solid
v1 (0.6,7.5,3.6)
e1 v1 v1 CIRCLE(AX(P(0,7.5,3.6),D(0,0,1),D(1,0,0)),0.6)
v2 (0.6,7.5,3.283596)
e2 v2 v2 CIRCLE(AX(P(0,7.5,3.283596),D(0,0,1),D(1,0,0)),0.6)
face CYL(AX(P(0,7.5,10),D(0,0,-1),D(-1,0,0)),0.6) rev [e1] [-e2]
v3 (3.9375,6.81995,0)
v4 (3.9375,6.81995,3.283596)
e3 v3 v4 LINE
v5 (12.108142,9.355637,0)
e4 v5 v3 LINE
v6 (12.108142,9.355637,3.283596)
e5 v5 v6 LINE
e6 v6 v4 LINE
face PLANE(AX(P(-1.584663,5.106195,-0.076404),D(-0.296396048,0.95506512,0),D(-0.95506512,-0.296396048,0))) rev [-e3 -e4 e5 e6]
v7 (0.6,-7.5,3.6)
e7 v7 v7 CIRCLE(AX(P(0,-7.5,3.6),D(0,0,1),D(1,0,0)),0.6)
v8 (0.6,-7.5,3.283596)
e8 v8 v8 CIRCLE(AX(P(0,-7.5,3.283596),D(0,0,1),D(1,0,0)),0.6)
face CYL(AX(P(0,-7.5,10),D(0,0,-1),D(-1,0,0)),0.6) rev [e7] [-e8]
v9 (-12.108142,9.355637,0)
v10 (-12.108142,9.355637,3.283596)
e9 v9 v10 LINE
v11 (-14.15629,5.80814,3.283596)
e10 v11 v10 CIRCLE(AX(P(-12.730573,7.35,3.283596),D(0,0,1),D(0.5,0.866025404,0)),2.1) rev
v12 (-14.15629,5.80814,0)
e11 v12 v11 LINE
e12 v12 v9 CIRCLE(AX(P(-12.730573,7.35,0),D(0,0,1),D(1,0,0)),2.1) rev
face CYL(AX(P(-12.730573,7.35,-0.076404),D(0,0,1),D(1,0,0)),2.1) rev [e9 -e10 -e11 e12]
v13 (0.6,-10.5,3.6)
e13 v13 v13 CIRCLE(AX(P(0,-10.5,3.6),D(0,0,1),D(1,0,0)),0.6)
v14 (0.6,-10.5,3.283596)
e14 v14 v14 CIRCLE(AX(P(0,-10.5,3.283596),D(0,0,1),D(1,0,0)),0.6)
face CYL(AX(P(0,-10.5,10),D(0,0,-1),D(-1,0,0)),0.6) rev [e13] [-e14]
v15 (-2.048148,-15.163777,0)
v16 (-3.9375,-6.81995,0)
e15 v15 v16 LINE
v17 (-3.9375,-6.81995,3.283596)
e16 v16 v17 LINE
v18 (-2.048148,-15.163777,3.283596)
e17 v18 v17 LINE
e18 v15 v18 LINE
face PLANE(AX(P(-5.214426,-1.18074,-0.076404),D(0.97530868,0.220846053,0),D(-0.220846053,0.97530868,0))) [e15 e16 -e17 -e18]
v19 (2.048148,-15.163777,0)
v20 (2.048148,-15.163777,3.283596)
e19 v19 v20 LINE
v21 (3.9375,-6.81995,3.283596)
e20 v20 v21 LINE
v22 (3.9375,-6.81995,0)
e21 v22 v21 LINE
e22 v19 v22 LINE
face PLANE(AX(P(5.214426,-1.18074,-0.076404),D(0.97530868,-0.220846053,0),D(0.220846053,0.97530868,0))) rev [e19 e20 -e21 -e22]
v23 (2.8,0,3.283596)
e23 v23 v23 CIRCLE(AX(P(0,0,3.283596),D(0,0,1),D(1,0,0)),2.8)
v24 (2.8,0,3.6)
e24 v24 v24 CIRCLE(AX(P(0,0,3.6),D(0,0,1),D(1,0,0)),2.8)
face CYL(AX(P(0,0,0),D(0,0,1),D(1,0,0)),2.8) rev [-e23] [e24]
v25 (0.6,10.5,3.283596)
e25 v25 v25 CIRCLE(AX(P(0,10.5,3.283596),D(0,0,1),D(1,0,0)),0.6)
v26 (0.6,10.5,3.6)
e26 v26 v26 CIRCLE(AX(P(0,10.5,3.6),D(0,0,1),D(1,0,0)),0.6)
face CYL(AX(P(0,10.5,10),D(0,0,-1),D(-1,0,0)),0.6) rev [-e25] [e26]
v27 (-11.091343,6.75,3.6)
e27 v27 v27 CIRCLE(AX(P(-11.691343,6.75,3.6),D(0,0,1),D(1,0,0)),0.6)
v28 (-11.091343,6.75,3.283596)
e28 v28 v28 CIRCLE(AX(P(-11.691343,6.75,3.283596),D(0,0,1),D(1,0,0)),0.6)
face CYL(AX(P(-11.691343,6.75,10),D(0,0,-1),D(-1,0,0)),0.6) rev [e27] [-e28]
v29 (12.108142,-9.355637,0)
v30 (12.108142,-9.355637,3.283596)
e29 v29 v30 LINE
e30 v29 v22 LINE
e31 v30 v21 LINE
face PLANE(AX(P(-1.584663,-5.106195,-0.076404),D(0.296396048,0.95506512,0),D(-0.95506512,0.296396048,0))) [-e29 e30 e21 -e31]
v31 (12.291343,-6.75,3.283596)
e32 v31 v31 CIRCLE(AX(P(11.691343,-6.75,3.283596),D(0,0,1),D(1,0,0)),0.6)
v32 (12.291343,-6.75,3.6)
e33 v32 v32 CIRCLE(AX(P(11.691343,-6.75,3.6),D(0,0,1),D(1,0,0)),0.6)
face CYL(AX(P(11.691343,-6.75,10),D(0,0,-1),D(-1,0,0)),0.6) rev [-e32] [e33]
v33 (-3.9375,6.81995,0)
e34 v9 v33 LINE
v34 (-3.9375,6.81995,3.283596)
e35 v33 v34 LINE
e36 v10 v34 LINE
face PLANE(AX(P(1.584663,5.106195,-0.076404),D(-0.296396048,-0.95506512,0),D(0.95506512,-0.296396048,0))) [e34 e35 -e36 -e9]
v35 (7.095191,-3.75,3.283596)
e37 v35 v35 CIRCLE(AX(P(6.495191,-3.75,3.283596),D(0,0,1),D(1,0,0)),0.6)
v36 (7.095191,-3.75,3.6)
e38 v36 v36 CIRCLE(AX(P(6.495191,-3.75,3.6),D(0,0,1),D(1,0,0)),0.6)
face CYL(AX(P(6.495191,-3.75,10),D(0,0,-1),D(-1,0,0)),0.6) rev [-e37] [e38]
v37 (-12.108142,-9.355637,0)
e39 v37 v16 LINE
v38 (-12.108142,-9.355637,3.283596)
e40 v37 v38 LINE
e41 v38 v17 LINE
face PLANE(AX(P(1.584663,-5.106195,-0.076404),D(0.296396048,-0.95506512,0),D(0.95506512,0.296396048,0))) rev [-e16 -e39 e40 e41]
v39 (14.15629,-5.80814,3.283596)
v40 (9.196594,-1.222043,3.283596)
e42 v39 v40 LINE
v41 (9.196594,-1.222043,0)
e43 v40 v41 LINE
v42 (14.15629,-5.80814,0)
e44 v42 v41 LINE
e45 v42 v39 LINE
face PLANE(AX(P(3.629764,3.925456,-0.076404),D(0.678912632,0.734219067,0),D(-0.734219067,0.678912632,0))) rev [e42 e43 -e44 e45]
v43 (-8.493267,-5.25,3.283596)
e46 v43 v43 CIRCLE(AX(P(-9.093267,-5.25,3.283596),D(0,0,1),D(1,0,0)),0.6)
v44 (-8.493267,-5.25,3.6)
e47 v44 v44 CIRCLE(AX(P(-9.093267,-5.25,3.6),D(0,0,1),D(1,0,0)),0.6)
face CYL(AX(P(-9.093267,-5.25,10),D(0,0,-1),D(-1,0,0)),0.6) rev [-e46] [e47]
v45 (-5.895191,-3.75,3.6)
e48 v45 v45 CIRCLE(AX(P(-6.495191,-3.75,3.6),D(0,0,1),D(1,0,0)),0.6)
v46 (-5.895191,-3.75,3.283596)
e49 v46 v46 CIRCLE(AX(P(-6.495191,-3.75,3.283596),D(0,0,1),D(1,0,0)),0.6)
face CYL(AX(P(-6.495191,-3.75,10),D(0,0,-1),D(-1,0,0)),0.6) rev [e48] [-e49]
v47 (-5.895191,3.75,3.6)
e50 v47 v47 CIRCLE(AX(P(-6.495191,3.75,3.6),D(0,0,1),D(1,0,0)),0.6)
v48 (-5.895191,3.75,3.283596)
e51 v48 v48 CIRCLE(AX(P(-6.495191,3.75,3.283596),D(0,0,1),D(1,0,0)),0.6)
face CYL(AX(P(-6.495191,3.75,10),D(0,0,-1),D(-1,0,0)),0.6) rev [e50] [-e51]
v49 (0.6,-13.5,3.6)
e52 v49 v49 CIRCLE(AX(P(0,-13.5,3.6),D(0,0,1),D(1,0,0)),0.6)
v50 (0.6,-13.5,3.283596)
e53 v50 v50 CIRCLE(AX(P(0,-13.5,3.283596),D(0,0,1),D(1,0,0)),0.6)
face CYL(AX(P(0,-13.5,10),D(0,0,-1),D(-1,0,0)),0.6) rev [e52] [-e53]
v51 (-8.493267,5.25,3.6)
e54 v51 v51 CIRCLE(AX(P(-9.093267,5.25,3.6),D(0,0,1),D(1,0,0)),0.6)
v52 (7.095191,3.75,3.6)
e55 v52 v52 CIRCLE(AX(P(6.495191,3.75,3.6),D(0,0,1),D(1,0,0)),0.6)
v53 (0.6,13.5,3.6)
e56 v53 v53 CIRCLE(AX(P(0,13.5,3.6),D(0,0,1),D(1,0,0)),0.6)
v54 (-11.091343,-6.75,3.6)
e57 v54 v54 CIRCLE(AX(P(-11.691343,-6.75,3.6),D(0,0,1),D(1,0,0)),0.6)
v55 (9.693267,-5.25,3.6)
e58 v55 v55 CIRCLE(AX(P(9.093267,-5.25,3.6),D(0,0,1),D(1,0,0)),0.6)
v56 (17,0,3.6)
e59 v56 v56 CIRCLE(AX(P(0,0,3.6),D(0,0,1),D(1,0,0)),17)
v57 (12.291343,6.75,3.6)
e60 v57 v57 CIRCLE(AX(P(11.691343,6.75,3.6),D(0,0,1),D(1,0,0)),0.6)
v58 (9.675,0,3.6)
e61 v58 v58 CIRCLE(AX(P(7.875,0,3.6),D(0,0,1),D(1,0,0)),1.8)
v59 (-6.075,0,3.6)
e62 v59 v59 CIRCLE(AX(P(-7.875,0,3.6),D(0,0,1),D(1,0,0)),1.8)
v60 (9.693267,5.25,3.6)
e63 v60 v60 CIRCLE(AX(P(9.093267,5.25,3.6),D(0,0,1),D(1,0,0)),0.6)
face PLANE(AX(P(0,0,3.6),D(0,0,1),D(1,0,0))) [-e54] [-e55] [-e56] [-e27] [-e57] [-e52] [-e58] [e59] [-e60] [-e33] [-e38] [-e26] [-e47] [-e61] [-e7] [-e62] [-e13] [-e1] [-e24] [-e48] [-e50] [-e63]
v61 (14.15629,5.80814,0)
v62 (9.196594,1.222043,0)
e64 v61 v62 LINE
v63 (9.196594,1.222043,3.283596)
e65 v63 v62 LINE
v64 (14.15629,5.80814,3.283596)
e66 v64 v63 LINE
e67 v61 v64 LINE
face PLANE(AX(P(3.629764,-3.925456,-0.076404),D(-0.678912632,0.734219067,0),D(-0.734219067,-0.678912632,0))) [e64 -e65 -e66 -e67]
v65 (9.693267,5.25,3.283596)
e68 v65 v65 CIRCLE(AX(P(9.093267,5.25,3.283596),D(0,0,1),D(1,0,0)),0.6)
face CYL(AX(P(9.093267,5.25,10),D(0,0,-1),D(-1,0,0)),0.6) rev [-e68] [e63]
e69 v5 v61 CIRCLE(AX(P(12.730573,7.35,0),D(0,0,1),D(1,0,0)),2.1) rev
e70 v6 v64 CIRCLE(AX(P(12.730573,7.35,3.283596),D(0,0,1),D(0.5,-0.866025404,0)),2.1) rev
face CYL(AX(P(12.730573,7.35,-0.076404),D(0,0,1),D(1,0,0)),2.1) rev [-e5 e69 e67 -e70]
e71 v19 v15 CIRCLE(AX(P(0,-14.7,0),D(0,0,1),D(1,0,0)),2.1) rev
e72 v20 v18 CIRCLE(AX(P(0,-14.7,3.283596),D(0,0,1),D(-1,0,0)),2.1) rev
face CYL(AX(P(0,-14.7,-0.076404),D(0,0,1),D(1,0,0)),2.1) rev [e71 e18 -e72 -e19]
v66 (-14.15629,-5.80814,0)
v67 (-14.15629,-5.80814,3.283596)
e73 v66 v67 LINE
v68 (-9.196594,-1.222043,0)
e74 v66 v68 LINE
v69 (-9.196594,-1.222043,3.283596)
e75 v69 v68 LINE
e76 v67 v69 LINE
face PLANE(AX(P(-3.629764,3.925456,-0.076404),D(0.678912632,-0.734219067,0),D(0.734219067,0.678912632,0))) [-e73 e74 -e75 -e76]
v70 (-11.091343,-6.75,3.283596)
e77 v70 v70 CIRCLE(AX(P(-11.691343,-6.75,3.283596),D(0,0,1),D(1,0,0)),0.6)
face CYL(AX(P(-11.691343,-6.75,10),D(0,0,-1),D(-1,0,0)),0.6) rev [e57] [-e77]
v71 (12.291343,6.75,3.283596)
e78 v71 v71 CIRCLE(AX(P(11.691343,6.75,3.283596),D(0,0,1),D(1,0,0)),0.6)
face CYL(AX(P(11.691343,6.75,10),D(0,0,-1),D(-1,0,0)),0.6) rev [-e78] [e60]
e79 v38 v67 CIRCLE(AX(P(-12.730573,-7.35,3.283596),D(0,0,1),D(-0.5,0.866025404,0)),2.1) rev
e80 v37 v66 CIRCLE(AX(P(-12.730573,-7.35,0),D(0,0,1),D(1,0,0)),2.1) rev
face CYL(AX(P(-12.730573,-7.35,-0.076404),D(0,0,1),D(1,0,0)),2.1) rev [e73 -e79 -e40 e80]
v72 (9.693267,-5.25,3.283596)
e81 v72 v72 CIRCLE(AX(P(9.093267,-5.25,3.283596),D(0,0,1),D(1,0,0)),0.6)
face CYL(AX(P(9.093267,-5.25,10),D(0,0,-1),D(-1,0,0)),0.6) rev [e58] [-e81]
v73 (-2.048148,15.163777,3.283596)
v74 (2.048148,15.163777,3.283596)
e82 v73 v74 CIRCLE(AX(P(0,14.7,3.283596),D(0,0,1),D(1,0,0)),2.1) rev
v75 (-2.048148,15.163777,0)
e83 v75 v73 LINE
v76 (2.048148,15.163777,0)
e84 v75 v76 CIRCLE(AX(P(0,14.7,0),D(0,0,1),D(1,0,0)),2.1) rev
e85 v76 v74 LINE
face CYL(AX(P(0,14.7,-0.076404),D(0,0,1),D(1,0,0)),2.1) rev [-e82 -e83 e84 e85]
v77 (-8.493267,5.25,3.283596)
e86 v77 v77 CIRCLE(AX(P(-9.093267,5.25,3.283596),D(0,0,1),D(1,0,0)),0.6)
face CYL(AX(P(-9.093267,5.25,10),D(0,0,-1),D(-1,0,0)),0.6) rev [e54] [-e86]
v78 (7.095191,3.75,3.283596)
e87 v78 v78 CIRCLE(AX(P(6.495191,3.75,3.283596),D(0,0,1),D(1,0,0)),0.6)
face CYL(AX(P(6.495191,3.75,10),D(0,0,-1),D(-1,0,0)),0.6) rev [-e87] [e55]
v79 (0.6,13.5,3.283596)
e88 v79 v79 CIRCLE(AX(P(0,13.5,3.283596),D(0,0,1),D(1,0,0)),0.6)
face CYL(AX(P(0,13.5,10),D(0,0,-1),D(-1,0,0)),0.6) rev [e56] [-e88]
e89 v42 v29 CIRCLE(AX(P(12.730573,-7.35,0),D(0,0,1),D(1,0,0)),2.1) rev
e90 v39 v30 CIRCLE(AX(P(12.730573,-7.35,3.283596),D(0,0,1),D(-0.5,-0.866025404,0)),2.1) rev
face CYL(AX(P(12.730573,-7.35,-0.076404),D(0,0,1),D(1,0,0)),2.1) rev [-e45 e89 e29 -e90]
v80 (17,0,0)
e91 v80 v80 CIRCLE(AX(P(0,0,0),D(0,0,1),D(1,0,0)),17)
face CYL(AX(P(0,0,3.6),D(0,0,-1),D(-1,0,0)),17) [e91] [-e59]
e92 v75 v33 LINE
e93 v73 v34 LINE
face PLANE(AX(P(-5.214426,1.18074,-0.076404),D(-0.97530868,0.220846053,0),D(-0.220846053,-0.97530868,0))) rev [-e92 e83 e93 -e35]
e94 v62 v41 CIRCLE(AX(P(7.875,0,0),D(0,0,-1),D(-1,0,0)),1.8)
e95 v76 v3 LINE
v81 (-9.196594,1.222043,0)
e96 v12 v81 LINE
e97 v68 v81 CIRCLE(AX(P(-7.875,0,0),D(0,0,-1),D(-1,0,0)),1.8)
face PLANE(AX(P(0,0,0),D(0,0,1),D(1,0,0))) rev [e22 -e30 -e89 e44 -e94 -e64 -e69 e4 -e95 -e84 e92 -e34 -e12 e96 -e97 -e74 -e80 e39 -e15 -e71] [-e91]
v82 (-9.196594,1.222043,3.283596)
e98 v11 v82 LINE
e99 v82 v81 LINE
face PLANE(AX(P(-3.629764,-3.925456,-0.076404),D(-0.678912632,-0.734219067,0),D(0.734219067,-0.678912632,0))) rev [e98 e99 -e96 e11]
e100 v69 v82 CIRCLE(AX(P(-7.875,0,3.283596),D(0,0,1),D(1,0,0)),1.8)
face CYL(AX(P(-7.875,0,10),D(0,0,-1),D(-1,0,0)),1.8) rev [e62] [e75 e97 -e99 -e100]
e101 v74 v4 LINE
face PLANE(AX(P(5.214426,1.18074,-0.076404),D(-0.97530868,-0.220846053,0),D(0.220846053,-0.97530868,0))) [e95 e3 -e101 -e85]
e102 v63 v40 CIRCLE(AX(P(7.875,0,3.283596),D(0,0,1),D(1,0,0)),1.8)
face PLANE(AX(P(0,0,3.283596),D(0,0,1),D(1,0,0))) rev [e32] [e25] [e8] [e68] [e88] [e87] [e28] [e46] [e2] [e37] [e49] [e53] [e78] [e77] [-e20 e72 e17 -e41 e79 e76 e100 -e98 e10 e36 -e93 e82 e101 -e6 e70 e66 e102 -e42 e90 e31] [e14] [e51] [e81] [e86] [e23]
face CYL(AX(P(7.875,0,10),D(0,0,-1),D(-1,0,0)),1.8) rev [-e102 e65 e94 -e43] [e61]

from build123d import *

# Parameters (mm, degrees)
SKETCH1_R               = 17
BOSS_EXTRUDE1_DEPTH     = 3.6
CAVITY1_OUTLINE_R       = 3.15
CAVITY1_DEPTH           = 3.283595969
CAVITY1_START           = 1.183595969
CAVITY1_2_OUTLINE_R     = 3.15
CAVITY1_2_OUTLINE_R_2   = 1.575
CAVITY1_2_DEPTH         = 2.1
SKETCH2_R               = 0.6
CUT_EXTRUDE1_DEPTH      = 10
CIRPATTERN1_COUNT       = 6
SKETCH3_R               = 4.596048158
CUT_EXTRUDE2_DEPTH      = 3.283595969
CUT_EXTRUDE3_DEPTH      = 25.309668858
CUT_EXTRUDE3_DEPTH_BACK = 25.309668858
SKETCH4_R               = 2.8
SKETCH6_R               = 1.8
CUT_EXTRUDE4_DEPTH      = 10


# Read off the part's stored shape, not the designer's step: Cavity1
with BuildPart() as part:
    # Sketch1 → Boss-Extrude1 (new body)
    with BuildSketch(Plane.XY):
        Circle(SKETCH1_R)
    extrude(amount=BOSS_EXTRUDE1_DEPTH)

    # Cavity1 outline → Cavity1 (cut)
    with BuildSketch(Plane.XY):
        with BuildLine():
            Line((3.9375, 6.819950055), (2.048148228, 15.163776711))
            ThreePointArc((2.048148228, 15.163776711), (0, 16.8), (-2.048148228, 15.163776711))
            Line((-2.048148228, 15.163776711), (-3.9375, 6.819950055))
            Line((-3.9375, 6.819950055), (-12.108141735, 9.355636751))
            ThreePointArc((-12.108141735, 9.355636751), (-14.549226784, 8.4), (-14.156289963, 5.80813996))
            Line((-14.156289963, 5.80813996), (-7.875, 0))
            Line((-7.875, 0), (-14.156289963, -5.80813996))
            ThreePointArc((-14.156289963, -5.80813996), (-14.549226784, -8.4), (-12.108141735, -9.355636751))
            Line((-12.108141735, -9.355636751), (-3.9375, -6.819950055))
            Line((-3.9375, -6.819950055), (-2.048148228, -15.163776711))
            ThreePointArc((-2.048148228, -15.163776711), (0, -16.8), (2.048148228, -15.163776711))
            Line((2.048148228, -15.163776711), (3.9375, -6.819950055))
            Line((3.9375, -6.819950055), (12.108141735, -9.355636751))
            ThreePointArc((12.108141735, -9.355636751), (14.549226784, -8.4), (14.156289963, -5.80813996))
            Line((14.156289963, -5.80813996), (7.875, 0))
            Line((7.875, 0), (14.156289963, 5.80813996))
            ThreePointArc((14.156289963, 5.80813996), (14.549226784, 8.4), (12.108141735, 9.355636751))
            Line((12.108141735, 9.355636751), (3.9375, 6.819950055))
        make_face()
        Circle(CAVITY1_OUTLINE_R, mode=Mode.SUBTRACT)
    extrude(amount=CAVITY1_DEPTH, mode=Mode.SUBTRACT)

    # Cavity1 2 outline → Cavity1 2 (cut)
    with BuildSketch(Plane.XY.offset(CAVITY1_START)):
        Circle(CAVITY1_2_OUTLINE_R)
        Circle(CAVITY1_2_OUTLINE_R_2, mode=Mode.SUBTRACT)
    extrude(amount=CAVITY1_2_DEPTH, mode=Mode.SUBTRACT)

    # Sketch2 → Cut-Extrude1 (cut)
    with BuildSketch(Plane(origin=(0, 0, 0), x_dir=(-1, 0, 0), z_dir=(0, 0, -1))):
        with Locations(Location((0, 13.5, 0), (0, 0, 180))):
            Circle(SKETCH2_R)
        with Locations(Location((0, 10.5, 0), (0, 0, 180))):
            Circle(SKETCH2_R)
        with Locations(Location((0, 7.5, 0), (0, 0, 180))):
            Circle(SKETCH2_R)
    cut_extrude1 = extrude(amount=-CUT_EXTRUDE1_DEPTH, mode=Mode.SUBTRACT)

    # CirPattern1: Cut-Extrude1 ×6 about axis
    cirpattern1_axis = Axis((0, 0, 0), (0, 0, 1))
    for i in range(1, CIRPATTERN1_COUNT):
        add(cut_extrude1.rotate(cirpattern1_axis, i * 360 / CIRPATTERN1_COUNT), mode=Mode.SUBTRACT)

    # Sketch3 → Cut-Extrude2 (cut)
    with BuildSketch(Plane(origin=(0, 0, 0), x_dir=(-1, 0, 0), z_dir=(0, 0, -1))):
        Circle(SKETCH3_R)
    extrude(amount=-CUT_EXTRUDE2_DEPTH, mode=Mode.SUBTRACT)

    # Sketch4 → Cut-Extrude3 (cut, two sides: drawn at the far end of the back side and taken through both)
    with BuildSketch(Plane.XY.offset(3.6).offset(-CUT_EXTRUDE3_DEPTH_BACK)):
        Circle(SKETCH4_R)
    extrude(amount=CUT_EXTRUDE3_DEPTH + CUT_EXTRUDE3_DEPTH_BACK, mode=Mode.SUBTRACT)

    # Sketch6 → Cut-Extrude4 (cut)
    with BuildSketch(Plane(origin=(0, 0, 0), x_dir=(-1, 0, 0), z_dir=(0, 0, -1))):
        with Locations(Location((-7.875, 0, 0), (0, 0, 137.241269402))):
            Circle(SKETCH6_R)
        with Locations(Location((7.875, 0, 0), (0, 0, 42.758730598))):
            Circle(SKETCH6_R)
    extrude(amount=-CUT_EXTRUDE4_DEPTH, mode=Mode.SUBTRACT)


solid = part.part
